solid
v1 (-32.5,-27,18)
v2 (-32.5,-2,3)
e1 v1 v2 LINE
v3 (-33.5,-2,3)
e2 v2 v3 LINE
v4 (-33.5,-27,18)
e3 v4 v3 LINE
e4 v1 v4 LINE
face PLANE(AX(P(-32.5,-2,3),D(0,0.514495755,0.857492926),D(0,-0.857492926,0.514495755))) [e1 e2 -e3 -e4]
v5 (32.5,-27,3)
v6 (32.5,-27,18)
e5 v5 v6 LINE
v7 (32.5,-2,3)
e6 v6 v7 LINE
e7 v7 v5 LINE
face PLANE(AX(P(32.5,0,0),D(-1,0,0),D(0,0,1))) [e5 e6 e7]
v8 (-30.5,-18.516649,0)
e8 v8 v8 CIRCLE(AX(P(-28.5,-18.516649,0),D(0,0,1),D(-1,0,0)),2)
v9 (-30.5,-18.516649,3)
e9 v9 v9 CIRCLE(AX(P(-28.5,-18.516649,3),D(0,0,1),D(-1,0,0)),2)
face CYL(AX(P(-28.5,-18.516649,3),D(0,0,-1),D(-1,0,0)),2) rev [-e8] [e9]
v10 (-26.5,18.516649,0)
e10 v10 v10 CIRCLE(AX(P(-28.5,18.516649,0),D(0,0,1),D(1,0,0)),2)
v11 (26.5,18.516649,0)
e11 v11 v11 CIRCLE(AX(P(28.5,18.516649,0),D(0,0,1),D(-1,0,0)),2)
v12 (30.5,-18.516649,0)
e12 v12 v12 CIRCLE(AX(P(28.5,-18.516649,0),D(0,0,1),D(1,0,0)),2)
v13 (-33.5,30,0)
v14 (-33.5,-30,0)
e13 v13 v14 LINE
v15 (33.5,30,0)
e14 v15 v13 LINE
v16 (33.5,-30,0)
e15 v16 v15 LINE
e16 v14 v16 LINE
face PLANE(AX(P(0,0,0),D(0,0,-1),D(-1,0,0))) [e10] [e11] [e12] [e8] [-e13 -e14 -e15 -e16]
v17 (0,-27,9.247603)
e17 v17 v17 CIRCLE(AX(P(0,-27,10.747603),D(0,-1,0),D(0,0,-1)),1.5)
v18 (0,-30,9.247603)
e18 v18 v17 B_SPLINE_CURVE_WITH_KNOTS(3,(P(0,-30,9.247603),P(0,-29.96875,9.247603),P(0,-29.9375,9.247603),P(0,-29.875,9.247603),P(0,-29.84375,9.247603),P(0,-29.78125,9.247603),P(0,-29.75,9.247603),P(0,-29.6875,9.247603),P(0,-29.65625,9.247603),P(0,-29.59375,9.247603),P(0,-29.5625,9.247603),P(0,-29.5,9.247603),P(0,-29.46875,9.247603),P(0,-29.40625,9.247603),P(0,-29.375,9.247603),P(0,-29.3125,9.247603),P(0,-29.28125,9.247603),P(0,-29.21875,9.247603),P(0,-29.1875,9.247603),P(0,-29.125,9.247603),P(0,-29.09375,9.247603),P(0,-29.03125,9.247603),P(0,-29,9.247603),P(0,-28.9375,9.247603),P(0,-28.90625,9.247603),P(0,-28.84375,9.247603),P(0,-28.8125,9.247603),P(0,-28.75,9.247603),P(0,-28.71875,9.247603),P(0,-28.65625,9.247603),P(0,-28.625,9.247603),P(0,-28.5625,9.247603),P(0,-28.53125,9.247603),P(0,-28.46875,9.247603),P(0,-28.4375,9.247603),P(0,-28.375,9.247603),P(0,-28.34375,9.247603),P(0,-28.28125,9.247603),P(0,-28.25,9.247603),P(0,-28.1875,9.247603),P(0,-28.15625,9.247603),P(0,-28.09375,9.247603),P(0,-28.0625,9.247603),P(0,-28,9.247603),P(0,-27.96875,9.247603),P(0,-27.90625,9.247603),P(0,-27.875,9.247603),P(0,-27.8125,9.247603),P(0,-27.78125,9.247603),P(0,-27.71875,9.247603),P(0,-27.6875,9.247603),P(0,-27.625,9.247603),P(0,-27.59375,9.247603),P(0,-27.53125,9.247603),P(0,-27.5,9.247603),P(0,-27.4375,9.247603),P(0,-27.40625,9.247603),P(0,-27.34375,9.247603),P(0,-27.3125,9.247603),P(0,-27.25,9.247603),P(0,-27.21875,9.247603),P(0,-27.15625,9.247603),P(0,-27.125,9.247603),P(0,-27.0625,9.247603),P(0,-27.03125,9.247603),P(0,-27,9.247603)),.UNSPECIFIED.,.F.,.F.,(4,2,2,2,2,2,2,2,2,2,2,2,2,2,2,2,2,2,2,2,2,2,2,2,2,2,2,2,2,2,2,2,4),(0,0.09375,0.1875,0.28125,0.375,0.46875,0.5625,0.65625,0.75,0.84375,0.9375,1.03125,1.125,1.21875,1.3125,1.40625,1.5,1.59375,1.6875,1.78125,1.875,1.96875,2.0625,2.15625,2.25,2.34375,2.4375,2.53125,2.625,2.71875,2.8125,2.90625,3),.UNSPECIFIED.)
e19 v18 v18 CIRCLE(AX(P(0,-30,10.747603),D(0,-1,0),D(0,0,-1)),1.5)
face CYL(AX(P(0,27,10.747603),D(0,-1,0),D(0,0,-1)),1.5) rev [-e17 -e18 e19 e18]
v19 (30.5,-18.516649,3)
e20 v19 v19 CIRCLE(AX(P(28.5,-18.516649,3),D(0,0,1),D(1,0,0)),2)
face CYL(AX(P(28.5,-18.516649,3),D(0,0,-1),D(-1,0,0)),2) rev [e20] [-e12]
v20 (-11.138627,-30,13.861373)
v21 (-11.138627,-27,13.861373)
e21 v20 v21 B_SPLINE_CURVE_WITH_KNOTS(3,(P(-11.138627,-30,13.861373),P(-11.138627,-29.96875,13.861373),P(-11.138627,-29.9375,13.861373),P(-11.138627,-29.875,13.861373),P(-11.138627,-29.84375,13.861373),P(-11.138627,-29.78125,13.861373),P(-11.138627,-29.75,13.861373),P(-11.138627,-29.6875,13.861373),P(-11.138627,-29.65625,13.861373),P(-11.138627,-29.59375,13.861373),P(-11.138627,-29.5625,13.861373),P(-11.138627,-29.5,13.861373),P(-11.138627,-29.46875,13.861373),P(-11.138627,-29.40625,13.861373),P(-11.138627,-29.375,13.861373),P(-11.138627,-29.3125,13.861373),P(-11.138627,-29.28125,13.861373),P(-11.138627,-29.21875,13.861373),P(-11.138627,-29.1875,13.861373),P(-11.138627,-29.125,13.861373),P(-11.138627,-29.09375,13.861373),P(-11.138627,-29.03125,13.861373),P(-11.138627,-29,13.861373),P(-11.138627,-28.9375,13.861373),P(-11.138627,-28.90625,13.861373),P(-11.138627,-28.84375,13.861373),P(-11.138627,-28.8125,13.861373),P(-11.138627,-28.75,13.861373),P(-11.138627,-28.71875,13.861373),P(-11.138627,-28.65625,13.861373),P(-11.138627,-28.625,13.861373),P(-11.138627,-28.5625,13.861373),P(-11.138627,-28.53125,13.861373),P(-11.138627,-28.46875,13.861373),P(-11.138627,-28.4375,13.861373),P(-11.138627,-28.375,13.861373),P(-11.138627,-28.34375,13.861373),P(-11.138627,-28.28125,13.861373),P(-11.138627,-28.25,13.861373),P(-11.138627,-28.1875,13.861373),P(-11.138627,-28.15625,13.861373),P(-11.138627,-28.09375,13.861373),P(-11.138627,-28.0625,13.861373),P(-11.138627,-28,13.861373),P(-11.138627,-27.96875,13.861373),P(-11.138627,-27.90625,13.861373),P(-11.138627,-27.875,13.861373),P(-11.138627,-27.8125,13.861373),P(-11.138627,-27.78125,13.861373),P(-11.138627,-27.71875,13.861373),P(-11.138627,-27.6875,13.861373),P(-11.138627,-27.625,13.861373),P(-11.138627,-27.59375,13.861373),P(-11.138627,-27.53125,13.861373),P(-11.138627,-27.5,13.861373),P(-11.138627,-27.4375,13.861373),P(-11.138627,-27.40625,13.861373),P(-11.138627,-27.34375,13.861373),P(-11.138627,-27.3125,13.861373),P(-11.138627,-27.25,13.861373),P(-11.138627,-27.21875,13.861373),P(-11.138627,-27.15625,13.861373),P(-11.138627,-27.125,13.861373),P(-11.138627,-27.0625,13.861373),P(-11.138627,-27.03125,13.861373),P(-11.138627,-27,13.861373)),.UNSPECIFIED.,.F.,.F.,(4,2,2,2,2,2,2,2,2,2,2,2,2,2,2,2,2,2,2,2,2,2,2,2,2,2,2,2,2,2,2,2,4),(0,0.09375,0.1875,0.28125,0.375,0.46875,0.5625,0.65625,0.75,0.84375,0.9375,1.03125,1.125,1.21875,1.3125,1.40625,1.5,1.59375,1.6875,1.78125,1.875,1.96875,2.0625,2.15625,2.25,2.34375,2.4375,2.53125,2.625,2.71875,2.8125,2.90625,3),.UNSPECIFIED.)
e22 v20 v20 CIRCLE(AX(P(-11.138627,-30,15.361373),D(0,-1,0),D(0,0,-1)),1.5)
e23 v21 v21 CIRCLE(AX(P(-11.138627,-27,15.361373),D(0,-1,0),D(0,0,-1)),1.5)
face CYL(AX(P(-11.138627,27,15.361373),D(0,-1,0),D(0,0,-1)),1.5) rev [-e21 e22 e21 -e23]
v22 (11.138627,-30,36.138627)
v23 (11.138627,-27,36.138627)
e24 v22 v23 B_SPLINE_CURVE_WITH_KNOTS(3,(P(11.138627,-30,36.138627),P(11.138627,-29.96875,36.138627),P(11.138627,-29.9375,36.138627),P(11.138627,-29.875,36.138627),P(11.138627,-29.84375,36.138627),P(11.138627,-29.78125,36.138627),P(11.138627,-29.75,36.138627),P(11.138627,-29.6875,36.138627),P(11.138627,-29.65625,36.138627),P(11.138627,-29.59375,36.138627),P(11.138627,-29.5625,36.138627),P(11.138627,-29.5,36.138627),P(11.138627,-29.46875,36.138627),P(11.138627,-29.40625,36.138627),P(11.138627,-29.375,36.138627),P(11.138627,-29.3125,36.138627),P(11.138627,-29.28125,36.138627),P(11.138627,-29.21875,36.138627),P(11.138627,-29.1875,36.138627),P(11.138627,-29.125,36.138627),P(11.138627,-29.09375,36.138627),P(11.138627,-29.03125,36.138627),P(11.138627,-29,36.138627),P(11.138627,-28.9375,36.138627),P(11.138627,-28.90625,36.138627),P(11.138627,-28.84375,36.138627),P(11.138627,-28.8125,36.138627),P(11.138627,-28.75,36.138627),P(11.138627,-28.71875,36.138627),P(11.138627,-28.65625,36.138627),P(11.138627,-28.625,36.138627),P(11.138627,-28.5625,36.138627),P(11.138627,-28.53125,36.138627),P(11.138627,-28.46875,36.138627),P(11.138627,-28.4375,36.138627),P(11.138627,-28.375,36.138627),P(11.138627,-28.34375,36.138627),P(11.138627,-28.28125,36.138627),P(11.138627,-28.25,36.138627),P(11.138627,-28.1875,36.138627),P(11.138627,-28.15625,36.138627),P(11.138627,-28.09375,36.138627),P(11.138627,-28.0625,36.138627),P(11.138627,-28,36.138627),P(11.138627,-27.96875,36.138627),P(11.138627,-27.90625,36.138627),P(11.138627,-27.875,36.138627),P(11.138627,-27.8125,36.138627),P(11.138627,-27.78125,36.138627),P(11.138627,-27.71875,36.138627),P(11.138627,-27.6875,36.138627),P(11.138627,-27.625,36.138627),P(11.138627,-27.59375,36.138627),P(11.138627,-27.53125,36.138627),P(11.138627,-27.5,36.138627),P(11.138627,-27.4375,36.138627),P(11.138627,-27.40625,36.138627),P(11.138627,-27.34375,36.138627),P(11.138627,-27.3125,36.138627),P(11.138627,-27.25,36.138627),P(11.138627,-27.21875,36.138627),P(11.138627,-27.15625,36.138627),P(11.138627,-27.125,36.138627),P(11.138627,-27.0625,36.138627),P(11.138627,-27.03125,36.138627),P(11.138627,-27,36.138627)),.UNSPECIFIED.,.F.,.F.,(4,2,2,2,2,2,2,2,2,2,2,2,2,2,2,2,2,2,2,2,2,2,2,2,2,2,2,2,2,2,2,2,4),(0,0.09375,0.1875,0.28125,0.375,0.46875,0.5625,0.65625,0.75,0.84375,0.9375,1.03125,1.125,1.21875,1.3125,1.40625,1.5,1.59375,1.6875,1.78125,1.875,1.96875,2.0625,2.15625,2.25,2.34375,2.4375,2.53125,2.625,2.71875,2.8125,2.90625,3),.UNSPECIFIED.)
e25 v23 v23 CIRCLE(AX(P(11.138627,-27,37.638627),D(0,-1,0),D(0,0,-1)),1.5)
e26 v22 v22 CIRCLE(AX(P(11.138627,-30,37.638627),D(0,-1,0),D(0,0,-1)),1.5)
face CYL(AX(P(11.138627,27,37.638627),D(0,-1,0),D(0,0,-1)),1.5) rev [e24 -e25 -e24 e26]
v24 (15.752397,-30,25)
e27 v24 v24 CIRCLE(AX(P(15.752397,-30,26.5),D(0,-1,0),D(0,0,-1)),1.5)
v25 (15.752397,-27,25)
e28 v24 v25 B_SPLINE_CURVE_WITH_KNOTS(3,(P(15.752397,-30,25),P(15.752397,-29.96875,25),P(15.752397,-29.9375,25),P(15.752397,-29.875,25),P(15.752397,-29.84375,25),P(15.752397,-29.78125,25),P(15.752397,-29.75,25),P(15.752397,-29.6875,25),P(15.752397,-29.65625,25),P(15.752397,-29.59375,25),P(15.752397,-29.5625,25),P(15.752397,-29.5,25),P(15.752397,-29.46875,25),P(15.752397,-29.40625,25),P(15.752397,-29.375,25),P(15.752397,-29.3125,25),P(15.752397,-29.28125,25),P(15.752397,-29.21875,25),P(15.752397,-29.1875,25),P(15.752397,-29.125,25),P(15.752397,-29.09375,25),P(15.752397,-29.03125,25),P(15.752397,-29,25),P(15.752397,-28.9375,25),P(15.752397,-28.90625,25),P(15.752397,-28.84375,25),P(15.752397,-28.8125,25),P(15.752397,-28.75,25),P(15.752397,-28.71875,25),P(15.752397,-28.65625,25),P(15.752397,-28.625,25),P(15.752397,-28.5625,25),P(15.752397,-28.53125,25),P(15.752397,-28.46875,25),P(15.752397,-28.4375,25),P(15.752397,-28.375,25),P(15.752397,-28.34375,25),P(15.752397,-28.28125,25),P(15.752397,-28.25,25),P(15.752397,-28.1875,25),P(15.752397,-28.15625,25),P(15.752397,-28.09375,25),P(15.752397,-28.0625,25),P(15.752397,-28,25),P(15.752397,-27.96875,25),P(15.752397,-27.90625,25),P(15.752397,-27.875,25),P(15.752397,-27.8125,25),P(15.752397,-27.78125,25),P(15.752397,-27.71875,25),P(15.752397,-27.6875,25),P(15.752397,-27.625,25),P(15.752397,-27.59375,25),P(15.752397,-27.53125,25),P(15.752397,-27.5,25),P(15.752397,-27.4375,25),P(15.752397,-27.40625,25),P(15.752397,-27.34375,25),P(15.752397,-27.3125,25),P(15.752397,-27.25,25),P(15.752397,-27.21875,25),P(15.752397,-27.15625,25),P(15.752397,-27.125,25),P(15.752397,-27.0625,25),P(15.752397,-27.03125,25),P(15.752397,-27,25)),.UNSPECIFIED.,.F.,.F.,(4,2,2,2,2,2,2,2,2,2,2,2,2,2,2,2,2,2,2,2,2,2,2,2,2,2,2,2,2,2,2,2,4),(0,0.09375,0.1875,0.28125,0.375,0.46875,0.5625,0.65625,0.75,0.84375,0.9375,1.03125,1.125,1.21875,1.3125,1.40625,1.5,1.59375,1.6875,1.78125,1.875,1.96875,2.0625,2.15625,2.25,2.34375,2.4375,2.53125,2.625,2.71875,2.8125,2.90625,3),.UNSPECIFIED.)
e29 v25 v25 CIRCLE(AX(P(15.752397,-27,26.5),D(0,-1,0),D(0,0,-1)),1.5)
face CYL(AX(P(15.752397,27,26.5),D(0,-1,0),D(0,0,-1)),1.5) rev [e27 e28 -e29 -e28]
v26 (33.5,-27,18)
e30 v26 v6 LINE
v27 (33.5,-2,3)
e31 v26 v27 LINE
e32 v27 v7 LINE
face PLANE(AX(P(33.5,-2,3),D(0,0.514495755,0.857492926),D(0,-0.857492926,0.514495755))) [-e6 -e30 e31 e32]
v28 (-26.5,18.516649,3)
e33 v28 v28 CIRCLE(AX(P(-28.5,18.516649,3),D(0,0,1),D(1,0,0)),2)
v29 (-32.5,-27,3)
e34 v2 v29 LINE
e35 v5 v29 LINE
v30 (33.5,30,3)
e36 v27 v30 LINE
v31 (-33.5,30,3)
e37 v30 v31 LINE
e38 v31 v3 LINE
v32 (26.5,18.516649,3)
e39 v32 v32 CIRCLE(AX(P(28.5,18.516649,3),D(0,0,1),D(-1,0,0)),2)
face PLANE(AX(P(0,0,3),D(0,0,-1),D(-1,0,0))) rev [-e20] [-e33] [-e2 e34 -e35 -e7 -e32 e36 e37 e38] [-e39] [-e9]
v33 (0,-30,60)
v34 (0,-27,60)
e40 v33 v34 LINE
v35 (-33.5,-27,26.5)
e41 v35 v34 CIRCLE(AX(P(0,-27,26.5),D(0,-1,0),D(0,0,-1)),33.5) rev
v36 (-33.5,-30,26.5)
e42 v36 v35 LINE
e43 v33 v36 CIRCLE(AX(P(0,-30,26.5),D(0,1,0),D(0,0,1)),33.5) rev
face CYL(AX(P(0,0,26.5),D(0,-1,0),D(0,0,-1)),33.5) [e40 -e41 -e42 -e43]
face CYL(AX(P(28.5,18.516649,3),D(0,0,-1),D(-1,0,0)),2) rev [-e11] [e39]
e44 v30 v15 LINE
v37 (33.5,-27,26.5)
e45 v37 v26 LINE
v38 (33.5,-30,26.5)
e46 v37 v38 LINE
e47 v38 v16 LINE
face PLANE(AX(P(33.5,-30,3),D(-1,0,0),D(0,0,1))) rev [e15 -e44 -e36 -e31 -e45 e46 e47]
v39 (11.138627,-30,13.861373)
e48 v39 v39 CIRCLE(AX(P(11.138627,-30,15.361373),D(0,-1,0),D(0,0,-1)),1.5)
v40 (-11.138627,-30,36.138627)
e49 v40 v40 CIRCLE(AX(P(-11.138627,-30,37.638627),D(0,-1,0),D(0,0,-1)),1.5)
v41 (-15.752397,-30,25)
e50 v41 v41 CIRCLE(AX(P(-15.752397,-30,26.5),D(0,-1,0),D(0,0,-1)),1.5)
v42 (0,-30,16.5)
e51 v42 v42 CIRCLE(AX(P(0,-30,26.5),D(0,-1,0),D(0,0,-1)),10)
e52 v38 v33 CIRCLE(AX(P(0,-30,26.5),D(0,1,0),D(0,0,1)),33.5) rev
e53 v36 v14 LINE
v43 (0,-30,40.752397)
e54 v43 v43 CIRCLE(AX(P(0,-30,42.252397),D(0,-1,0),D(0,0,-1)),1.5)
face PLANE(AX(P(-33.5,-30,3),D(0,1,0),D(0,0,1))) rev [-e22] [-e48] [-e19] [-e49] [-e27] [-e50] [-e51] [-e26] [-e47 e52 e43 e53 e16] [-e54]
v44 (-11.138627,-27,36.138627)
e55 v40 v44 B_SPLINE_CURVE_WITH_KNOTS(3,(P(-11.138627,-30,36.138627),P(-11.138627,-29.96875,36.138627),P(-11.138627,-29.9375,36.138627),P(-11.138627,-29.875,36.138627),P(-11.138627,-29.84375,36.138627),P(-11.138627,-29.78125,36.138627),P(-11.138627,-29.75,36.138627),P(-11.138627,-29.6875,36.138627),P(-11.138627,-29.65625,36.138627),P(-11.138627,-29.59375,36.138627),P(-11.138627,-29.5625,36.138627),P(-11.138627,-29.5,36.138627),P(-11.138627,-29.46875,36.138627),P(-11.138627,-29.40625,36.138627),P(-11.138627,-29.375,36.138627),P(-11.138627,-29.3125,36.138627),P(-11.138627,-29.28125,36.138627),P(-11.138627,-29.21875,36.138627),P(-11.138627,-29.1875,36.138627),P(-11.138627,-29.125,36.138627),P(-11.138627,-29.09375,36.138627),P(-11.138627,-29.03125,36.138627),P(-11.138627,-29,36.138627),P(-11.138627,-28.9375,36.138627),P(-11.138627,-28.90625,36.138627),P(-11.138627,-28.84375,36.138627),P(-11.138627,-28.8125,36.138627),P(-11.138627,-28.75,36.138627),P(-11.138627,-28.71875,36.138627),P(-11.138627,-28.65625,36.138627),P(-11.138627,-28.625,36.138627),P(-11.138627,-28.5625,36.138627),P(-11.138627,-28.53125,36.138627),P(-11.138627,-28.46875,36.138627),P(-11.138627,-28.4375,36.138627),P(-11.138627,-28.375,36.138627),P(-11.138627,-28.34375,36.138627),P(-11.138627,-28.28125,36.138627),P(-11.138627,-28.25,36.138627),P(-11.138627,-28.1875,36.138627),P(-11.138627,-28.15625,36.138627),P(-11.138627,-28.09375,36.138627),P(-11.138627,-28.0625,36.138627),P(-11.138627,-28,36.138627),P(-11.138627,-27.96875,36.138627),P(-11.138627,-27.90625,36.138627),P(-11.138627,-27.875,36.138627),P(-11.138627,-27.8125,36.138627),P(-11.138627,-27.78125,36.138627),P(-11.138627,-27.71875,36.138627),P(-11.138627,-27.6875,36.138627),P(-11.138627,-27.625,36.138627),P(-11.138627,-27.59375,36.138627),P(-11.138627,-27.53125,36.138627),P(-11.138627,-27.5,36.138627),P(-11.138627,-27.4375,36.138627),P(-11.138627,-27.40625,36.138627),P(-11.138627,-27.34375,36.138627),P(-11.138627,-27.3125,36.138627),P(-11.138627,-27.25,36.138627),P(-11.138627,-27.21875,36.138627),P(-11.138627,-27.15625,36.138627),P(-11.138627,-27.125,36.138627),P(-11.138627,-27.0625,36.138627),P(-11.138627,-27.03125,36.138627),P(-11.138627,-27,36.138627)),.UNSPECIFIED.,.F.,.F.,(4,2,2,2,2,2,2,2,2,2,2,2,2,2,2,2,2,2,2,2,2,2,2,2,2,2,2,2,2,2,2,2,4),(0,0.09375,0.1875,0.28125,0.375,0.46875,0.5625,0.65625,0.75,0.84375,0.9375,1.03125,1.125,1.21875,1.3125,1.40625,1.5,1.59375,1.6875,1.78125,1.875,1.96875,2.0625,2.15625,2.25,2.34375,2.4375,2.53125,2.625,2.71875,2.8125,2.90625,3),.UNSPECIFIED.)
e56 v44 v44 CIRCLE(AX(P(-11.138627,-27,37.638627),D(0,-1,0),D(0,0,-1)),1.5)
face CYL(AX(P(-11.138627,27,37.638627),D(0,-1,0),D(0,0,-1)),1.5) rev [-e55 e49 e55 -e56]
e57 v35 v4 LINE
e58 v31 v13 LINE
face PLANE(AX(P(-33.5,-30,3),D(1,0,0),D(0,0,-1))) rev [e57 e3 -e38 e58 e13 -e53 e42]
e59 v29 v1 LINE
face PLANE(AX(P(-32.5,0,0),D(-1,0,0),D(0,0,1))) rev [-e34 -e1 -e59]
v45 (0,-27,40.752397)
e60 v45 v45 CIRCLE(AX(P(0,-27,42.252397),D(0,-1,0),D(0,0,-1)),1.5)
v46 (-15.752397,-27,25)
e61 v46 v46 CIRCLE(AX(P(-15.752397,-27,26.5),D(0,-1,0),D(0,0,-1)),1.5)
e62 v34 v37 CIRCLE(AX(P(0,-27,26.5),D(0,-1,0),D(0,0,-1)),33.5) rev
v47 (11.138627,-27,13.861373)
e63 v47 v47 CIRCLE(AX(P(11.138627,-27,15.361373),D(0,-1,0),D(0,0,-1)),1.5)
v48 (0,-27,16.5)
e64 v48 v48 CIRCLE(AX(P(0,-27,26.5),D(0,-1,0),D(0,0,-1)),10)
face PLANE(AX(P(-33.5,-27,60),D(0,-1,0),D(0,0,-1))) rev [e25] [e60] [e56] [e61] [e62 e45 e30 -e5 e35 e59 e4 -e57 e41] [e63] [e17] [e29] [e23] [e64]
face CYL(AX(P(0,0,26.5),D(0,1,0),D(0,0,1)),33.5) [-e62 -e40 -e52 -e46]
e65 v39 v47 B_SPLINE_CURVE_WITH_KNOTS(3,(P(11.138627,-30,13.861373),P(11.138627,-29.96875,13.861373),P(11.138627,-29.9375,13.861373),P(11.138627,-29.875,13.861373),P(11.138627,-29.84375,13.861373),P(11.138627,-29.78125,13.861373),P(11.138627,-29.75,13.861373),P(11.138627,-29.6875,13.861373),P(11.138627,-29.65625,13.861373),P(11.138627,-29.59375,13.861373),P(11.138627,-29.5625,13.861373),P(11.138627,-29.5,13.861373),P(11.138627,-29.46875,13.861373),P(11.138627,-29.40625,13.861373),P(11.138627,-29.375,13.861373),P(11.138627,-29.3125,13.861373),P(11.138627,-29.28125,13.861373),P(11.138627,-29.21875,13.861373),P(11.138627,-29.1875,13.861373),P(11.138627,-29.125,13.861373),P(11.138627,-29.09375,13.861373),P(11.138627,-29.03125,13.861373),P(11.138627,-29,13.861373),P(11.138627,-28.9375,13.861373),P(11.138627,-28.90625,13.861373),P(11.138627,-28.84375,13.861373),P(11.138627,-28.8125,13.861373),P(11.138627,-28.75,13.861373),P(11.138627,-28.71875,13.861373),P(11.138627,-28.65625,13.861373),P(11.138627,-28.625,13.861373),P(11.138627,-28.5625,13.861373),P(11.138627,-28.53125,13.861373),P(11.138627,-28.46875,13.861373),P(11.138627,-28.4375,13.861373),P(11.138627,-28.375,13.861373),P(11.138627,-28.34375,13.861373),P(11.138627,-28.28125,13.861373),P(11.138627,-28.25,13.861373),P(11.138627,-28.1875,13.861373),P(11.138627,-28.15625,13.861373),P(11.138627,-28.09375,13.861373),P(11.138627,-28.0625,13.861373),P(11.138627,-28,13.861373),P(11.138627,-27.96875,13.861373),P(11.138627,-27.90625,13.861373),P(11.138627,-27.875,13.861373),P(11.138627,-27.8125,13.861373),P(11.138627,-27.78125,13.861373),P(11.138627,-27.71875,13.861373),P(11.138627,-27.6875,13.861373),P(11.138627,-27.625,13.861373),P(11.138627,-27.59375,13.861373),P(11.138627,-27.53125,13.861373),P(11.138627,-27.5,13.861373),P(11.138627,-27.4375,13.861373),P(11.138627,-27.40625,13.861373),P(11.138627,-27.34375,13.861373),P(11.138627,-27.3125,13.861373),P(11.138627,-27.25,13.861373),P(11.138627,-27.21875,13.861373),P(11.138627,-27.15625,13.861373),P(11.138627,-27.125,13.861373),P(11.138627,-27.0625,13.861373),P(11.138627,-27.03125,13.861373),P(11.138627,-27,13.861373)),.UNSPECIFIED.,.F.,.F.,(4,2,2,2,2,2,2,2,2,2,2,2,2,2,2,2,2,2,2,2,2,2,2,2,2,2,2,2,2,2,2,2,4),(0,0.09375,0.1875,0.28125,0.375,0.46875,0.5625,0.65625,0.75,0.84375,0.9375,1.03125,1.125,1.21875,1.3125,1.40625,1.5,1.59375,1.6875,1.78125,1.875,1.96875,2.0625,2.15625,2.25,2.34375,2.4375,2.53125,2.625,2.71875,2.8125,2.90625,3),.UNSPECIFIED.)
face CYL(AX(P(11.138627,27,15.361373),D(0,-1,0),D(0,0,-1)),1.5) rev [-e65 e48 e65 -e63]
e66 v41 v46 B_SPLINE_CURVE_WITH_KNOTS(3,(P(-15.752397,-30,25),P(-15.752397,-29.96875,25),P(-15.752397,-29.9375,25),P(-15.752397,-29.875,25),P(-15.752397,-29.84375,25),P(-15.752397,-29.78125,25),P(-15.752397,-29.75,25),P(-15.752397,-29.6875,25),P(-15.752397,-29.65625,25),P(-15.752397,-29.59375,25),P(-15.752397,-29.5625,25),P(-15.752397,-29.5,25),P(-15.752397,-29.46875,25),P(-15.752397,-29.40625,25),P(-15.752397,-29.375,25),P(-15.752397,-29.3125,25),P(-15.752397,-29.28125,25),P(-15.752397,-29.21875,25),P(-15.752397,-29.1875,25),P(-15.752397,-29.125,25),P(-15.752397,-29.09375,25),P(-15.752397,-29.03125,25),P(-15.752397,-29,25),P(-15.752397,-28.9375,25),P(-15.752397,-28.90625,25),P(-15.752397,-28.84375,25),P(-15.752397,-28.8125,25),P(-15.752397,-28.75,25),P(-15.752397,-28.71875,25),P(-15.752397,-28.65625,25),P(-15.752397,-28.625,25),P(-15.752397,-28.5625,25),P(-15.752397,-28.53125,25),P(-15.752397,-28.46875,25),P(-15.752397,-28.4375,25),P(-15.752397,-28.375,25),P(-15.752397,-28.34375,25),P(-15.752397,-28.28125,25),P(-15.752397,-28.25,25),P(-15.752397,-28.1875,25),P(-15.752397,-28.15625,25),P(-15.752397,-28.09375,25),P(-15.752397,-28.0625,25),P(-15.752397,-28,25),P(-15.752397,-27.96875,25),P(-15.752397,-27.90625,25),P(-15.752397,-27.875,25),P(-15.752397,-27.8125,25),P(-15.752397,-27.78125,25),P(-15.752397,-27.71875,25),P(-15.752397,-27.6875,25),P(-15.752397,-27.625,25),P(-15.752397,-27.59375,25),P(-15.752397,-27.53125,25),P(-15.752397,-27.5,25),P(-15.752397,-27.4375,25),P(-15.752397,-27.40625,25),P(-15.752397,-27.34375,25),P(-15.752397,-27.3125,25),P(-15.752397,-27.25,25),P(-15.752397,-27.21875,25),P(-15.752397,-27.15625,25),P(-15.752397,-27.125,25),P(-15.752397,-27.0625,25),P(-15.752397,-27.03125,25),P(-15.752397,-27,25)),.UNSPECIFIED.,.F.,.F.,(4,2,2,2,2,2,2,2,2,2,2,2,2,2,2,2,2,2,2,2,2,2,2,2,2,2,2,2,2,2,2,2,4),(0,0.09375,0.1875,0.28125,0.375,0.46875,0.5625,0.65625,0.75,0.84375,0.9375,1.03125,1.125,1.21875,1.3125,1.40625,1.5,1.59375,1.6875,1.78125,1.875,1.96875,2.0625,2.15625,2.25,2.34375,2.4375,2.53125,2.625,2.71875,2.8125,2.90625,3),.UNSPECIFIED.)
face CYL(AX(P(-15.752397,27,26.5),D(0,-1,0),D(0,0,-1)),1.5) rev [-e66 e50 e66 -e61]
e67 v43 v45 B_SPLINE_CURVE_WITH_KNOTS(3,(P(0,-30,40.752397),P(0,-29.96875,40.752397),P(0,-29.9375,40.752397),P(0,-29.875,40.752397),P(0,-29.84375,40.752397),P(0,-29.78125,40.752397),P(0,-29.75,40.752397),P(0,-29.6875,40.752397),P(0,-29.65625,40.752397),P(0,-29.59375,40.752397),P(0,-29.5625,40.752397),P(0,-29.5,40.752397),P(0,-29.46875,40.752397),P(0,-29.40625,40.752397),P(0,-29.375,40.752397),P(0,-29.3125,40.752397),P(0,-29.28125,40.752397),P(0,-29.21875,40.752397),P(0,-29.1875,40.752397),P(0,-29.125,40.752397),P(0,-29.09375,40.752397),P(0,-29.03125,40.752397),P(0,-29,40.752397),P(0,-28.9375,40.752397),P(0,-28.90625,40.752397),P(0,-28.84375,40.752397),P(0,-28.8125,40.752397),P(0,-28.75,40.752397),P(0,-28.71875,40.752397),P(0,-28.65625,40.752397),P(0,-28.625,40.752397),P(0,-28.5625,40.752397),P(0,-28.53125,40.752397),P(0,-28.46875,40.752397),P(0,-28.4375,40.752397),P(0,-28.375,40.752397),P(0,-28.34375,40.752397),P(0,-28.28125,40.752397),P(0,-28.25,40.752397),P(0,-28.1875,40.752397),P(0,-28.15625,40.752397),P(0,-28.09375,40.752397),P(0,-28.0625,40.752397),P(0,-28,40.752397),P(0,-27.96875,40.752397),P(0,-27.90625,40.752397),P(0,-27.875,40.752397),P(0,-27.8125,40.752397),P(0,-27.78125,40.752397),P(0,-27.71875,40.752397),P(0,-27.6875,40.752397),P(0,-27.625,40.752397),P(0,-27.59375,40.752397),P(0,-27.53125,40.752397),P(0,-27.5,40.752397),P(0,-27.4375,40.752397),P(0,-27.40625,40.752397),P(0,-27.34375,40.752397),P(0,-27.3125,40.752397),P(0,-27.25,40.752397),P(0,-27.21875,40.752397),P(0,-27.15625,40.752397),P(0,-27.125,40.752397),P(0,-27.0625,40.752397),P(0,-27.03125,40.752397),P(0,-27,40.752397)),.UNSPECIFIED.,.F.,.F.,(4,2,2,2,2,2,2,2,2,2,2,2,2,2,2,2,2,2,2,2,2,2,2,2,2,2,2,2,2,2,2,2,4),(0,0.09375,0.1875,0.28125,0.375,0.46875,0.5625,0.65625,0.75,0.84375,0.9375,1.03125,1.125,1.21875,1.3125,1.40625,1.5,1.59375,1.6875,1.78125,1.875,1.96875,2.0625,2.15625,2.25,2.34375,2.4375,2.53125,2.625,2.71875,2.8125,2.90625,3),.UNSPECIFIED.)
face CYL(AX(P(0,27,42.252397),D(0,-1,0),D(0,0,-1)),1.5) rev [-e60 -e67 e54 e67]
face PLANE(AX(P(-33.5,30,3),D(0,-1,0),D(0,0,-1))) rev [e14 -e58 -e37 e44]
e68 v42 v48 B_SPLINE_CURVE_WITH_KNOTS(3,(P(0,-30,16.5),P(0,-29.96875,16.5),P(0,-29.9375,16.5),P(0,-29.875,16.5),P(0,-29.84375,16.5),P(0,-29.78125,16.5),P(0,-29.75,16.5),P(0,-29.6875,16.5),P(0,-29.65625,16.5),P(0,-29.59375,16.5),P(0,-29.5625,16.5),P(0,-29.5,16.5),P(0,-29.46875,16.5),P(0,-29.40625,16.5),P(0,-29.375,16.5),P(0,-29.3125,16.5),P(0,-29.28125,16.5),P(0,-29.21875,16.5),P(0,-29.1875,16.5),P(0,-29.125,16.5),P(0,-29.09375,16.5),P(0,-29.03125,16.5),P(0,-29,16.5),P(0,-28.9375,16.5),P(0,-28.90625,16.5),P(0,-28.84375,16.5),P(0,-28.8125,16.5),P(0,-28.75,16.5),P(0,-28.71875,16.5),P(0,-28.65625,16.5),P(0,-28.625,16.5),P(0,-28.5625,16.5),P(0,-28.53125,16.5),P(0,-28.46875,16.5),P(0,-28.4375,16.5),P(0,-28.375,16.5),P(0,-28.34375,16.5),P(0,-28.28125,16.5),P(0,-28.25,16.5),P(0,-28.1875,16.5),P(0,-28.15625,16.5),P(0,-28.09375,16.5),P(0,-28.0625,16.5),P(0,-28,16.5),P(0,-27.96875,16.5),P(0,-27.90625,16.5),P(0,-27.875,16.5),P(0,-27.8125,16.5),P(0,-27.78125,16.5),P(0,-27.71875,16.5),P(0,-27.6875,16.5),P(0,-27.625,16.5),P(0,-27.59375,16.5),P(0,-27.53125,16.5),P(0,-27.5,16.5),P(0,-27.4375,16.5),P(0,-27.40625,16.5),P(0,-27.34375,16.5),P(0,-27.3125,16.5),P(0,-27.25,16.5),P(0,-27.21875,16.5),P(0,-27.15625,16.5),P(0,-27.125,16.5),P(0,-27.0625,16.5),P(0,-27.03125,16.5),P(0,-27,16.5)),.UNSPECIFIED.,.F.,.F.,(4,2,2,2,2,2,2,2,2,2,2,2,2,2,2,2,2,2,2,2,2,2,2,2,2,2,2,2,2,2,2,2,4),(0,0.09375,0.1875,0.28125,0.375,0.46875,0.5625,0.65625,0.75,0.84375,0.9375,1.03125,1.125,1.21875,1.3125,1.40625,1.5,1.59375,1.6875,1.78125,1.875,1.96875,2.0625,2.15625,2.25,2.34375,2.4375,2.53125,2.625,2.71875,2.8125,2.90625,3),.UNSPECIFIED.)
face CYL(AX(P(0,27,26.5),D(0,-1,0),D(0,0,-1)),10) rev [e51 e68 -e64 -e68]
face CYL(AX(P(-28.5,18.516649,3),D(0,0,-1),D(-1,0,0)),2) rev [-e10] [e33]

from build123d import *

# Parameters (mm, degrees)
SKETCH1_W           = 67
SKETCH1_H           = 60
SKETCH1_R           = 2
BOSS_EXTRUDE1_DEPTH = 3
SKETCH2_W           = 67
SKETCH2_H           = 3
BOSS_EXTRUDE2_DEPTH = 57
FILLET1_R           = 33.5
SKETCH3_R           = 10
SKETCH3_R_2         = 1.5
CUT_EXTRUDE1_DEPTH  = 57
BOSS_EXTRUDE3_DEPTH = 1
BOSS_EXTRUDE4_START = -66
BOSS_EXTRUDE4_DEPTH = 1


with BuildPart() as part:
    # Sketch1 → Boss-Extrude1 (new body)
    with BuildSketch(Plane.XY):
        Rectangle(SKETCH1_W, SKETCH1_H)
        with Locations((-28.5, 18.516649199)):
            Circle(SKETCH1_R, mode=Mode.SUBTRACT)
        with Locations(Location((28.5, 18.516649199, 0), (0, 0, 180))):
            Circle(SKETCH1_R, mode=Mode.SUBTRACT)
        with Locations((28.5, -18.516649199)):
            Circle(SKETCH1_R, mode=Mode.SUBTRACT)
        with Locations(Location((-28.5, -18.516649199, 0), (0, 0, 180))):
            Circle(SKETCH1_R, mode=Mode.SUBTRACT)
    extrude(amount=BOSS_EXTRUDE1_DEPTH)

    # Sketch2 → Boss-Extrude2 (add)
    with BuildSketch(Plane.XY.offset(3)):
        with Locations((0, -28.5)):
            Rectangle(SKETCH2_W, SKETCH2_H)
    extrude(amount=BOSS_EXTRUDE2_DEPTH)

    # Fillet1
    fillet1_edges = [part.edges().sort_by_distance(p)[0] for p in [
        (-33.5, -28.5, 60),
        (33.5, -28.5, 60),
    ]]
    fillet(fillet1_edges, radius=FILLET1_R - 0.0001)  # a hair under: the kernel refuses the full size

    # Sketch3 → Cut-Extrude1 (cut)
    with BuildSketch(Plane.XZ.offset(30)):
        with Locations(Location((0, 26.5, 0), (0, 0, 270))):
            Circle(SKETCH3_R)
        with Locations(Location((0, 42.252397405, 0), (0, 0, 270))):
            Circle(SKETCH3_R_2)
        with Locations(Location((11.138627025, 37.638627025, 0), (0, 0, 270))):
            Circle(SKETCH3_R_2)
        with Locations(Location((15.752397405, 26.5, 0), (0, 0, 270))):
            Circle(SKETCH3_R_2)
        with Locations(Location((11.138627025, 15.361372975, 0), (0, 0, 270))):
            Circle(SKETCH3_R_2)
        with Locations(Location((0, 10.747602595, 0), (0, 0, 270))):
            Circle(SKETCH3_R_2)
        with Locations(Location((-11.138627025, 15.361372975, 0), (0, 0, 270))):
            Circle(SKETCH3_R_2)
        with Locations(Location((-15.752397405, 26.5, 0), (0, 0, 270))):
            Circle(SKETCH3_R_2)
        with Locations(Location((-11.138627025, 37.638627025, 0), (0, 0, 270))):
            Circle(SKETCH3_R_2)
    extrude(amount=-CUT_EXTRUDE1_DEPTH, mode=Mode.SUBTRACT)

    # Sketch4 → Boss-Extrude3 (add)
    with BuildSketch(Plane.ZY.offset(33.5)):
        Polygon((3, -2), (18, -27), (3, -27), align=None)
    extrude(amount=-BOSS_EXTRUDE3_DEPTH)

    # Sketch4<2> → Boss-Extrude4 (add)
    with BuildSketch(Plane.ZY.offset(33.5).offset(BOSS_EXTRUDE4_START)):
        Polygon((3, -2), (18, -27), (3, -27), align=None)
    extrude(amount=-BOSS_EXTRUDE4_DEPTH)


solid = part.part
